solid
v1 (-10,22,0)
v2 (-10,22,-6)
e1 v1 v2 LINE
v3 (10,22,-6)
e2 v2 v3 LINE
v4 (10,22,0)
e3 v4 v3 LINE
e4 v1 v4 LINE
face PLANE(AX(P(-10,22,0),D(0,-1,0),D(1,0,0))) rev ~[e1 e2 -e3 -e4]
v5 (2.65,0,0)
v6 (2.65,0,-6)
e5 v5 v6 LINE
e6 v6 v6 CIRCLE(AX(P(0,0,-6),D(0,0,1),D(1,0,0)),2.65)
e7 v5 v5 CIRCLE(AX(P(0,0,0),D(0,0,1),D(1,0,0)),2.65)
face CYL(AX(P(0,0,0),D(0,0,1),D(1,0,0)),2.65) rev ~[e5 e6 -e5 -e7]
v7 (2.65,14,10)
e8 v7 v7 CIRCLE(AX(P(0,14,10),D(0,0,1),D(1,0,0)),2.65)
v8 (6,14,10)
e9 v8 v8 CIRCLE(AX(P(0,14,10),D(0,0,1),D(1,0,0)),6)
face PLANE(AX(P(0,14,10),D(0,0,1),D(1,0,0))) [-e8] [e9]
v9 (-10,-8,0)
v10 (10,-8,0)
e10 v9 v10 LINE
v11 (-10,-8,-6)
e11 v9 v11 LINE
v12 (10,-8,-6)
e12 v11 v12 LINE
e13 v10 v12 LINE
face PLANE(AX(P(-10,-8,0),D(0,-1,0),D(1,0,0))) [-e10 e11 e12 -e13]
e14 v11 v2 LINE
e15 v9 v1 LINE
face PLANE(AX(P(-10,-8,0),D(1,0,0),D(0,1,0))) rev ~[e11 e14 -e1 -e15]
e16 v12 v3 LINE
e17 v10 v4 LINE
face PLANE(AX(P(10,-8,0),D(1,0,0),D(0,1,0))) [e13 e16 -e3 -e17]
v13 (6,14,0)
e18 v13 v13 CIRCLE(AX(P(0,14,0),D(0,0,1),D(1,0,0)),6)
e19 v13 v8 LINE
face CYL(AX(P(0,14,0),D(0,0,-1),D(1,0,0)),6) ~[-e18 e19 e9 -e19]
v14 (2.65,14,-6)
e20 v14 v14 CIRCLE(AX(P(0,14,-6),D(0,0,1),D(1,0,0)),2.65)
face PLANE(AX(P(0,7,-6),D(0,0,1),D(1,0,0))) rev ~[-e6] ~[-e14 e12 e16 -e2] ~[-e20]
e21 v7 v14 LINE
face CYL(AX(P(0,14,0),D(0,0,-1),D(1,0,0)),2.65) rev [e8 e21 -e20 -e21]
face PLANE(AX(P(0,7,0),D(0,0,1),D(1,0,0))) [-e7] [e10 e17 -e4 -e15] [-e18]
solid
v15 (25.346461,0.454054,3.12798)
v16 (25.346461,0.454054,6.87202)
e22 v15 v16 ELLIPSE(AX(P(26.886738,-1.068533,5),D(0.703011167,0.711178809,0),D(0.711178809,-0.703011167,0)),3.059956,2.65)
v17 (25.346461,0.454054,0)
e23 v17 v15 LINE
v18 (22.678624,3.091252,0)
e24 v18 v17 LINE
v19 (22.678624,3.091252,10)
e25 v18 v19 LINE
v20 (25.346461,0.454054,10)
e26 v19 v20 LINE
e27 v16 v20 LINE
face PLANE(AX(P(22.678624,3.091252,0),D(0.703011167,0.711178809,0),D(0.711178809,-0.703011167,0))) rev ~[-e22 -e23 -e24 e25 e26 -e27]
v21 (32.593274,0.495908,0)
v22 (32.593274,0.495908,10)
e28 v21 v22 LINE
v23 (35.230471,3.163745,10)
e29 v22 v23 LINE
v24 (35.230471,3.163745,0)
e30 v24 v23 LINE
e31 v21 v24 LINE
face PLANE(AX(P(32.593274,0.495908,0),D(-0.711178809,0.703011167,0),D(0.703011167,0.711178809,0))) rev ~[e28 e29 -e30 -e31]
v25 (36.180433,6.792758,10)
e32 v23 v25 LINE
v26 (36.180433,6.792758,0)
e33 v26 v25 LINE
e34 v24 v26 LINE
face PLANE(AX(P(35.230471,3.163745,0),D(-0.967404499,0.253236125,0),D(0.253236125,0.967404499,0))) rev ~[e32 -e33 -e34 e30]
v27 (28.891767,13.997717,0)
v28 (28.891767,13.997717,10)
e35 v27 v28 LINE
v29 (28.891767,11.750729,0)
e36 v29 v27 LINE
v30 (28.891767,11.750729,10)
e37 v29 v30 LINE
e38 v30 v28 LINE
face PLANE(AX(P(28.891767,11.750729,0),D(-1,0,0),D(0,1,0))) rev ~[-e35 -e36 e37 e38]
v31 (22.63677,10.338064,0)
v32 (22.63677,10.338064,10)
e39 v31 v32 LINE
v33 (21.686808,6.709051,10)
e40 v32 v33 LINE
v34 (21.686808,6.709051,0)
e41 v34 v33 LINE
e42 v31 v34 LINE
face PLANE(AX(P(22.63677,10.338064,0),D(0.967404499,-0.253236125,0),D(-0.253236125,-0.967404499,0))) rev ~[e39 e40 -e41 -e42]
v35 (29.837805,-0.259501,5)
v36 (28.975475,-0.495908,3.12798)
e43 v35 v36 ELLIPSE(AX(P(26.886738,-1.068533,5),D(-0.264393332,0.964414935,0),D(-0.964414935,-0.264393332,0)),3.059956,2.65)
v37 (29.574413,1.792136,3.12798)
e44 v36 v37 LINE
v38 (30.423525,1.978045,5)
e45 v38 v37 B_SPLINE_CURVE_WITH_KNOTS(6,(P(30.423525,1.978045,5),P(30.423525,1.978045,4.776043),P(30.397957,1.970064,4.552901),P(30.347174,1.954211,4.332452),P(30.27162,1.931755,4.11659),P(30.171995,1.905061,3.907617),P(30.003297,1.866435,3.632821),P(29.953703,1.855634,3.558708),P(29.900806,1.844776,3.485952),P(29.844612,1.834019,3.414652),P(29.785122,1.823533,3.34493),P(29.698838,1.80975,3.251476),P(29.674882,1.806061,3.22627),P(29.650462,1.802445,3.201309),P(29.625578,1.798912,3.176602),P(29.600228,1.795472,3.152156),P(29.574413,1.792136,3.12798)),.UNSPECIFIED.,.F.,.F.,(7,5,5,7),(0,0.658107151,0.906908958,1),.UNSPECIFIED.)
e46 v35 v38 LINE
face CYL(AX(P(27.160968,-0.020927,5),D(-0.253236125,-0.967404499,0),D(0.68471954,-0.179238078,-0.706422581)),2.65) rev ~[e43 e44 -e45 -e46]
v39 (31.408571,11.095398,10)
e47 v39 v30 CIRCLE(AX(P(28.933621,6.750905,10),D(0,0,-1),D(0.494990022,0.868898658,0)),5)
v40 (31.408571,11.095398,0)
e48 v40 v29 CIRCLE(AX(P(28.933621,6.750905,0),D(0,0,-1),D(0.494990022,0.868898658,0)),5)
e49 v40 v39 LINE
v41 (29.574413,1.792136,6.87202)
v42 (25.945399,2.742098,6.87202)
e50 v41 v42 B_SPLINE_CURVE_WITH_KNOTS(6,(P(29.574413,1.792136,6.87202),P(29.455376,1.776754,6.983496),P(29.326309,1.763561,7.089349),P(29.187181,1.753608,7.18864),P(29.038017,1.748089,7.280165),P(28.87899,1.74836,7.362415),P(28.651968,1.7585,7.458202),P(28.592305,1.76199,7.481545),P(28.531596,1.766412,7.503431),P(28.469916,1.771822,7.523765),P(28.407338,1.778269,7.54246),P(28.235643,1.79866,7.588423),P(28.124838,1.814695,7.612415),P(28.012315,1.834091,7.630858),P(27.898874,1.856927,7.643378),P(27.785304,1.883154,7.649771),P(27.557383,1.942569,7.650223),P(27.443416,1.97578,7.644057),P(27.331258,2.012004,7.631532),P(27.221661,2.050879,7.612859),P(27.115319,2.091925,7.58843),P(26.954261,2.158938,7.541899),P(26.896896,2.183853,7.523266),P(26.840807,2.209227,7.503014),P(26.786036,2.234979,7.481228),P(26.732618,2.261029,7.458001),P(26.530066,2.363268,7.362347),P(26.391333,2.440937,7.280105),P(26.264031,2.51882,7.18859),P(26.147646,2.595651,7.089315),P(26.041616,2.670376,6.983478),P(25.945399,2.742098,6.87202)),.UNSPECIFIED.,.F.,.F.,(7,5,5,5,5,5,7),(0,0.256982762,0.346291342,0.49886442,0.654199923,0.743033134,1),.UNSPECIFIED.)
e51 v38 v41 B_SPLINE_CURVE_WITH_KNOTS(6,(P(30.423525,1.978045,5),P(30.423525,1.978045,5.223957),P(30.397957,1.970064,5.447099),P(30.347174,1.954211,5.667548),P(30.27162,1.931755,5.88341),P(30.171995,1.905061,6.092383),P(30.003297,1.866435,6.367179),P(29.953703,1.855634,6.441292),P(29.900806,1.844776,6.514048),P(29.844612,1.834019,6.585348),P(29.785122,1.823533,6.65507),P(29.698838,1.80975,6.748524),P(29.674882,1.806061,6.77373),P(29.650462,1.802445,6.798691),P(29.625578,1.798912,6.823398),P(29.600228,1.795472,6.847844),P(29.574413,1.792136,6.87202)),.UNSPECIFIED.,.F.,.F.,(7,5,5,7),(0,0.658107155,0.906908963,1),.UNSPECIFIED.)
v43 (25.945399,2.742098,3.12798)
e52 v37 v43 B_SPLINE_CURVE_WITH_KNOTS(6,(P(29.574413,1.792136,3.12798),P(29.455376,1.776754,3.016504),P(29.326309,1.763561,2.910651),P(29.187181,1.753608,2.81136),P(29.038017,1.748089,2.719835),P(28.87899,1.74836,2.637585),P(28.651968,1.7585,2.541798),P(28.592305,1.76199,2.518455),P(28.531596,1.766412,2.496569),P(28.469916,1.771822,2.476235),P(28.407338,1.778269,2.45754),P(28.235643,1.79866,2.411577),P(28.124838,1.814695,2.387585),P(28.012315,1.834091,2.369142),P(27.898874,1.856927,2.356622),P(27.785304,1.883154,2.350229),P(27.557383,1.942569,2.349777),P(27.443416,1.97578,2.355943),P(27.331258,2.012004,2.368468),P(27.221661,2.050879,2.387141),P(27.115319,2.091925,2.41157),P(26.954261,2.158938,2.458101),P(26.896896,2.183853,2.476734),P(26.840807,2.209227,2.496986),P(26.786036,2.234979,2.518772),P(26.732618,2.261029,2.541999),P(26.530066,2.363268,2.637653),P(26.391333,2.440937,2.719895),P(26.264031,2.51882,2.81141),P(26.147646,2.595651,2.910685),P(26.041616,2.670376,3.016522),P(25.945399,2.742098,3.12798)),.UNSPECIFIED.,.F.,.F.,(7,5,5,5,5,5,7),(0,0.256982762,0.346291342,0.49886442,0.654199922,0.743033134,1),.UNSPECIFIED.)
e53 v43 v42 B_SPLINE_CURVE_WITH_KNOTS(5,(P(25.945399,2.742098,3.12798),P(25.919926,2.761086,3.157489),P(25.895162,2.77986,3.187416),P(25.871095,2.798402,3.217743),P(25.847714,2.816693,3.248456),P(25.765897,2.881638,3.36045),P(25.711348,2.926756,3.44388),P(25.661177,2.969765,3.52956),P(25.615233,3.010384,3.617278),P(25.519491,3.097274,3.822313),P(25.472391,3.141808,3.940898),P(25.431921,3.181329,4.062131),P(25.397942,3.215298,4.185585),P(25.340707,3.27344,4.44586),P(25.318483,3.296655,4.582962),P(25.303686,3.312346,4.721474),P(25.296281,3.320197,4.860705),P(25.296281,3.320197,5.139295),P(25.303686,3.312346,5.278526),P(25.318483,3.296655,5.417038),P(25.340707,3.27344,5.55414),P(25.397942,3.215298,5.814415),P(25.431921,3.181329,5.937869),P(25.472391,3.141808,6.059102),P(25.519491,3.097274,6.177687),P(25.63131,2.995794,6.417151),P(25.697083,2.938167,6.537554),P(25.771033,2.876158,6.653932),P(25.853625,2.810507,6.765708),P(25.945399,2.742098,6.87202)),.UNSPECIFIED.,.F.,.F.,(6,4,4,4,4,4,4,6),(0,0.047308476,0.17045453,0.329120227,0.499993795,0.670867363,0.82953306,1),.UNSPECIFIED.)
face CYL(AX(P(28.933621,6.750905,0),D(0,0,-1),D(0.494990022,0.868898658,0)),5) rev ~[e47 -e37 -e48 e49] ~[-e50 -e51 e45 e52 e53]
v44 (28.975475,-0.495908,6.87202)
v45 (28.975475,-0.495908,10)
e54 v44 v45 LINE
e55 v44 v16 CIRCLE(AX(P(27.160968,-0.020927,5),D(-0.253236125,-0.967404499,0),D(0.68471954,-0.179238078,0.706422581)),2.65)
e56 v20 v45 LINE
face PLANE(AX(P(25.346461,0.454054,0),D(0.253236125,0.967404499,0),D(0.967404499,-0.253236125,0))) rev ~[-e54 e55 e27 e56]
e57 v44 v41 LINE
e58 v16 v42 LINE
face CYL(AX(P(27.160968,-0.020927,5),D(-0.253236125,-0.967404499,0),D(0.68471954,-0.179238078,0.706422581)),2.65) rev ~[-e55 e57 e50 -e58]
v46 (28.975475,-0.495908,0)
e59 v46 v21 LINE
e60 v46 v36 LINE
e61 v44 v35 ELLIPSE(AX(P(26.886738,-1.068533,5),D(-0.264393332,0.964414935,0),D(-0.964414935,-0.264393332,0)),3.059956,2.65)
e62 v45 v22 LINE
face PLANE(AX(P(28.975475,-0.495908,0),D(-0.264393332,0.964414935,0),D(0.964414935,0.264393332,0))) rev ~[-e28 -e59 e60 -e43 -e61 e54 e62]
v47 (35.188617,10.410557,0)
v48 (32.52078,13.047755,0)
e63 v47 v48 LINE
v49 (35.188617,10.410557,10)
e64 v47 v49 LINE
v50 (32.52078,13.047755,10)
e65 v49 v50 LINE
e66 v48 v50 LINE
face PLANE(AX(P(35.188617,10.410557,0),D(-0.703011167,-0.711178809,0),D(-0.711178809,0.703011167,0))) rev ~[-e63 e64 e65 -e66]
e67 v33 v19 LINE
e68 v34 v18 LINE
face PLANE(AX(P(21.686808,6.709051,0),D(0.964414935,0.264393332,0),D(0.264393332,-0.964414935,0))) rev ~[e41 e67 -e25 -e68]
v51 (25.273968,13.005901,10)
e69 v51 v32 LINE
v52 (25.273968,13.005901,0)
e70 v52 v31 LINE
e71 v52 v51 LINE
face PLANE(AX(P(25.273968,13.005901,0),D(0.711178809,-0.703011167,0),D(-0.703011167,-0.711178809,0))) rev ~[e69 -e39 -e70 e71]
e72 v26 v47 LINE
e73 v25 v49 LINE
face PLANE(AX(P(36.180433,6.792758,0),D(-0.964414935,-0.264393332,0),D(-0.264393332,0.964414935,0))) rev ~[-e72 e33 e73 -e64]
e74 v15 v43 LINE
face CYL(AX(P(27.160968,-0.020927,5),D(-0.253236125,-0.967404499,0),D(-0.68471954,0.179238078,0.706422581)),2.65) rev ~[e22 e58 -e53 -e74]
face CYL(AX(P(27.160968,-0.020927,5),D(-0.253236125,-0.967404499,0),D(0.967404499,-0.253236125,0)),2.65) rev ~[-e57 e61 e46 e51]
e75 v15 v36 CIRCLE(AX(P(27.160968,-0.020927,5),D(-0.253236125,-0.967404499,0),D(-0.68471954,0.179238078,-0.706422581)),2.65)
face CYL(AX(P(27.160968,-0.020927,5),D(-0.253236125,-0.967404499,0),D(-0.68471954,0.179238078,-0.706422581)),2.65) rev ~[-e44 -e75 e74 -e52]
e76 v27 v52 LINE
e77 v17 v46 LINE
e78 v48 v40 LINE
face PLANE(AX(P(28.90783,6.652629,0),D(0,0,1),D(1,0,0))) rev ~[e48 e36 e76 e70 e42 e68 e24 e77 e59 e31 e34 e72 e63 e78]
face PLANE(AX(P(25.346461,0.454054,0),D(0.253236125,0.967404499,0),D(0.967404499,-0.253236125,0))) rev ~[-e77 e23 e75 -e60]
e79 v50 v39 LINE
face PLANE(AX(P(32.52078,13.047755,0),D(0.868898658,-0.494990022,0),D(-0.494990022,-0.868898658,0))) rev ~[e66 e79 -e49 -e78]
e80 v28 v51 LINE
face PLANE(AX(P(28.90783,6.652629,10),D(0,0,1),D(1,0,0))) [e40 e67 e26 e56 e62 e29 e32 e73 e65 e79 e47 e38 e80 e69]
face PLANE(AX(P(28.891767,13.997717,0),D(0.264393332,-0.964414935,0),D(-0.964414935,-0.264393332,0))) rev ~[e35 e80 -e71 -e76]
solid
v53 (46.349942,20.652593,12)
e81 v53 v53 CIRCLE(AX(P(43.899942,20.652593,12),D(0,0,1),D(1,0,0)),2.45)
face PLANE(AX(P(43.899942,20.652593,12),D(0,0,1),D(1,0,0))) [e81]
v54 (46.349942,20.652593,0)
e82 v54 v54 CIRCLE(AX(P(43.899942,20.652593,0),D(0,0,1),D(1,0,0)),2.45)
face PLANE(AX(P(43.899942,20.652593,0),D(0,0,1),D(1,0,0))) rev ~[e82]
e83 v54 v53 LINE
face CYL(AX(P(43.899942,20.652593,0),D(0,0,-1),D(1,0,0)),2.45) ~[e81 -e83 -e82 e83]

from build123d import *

# Parameters (mm, degrees)
F0_W     = 20
F0_H     = 30
F0_R     = 2.65
F0_R_2   = 6
F1_DEPTH = 6
F2_DEPTH = 10
F3_DEPTH = 10
F5_DEPTH = 2.7610118925
F0_R_3   = 2.45
F6_DEPTH = 12


# Not quite as in the source:
# - a feature names something its author has since deleted; it is built from what else it names


with BuildPart() as f1:
    # F0 (on Top) → F1 (new body)
    with BuildSketch(Plane.XY):
        with Locations((0, 7)):
            Rectangle(F0_W, F0_H)
        Circle(F0_R, mode=Mode.SUBTRACT)
        with Locations((0, 14)):
            Circle(F0_R_2, mode=Mode.SUBTRACT)
        with Locations((0, 14)):
            Circle(F0_R_2)
        with Locations((0, 14)):
            Circle(F0_R, mode=Mode.SUBTRACT)
    extrude(amount=-F1_DEPTH)

    # F0 (on Top) → F2 (join)
    with BuildSketch(Plane.XY):
        with Locations((0, 14)):
            Circle(F0_R_2)
        with Locations((0, 14)):
            Circle(F0_R, mode=Mode.SUBTRACT)
    extrude(amount=F2_DEPTH)


with BuildPart() as f3:
    # F0 (on Top) → F3 (new body)
    with BuildSketch(Plane.XY):
        with BuildLine():
            ThreePointArc((31.4085708903, 11.0953978322), (27.6737183454, 1.912242965), (28.8917668759, 11.750729364))
            Line((28.8917668759, 11.750729364), (28.8917668759, 13.9977169424))
            Line((28.8917668759, 13.9977169424), (25.2739680355, 13.0059012255))
            Line((25.2739680355, 13.0059012255), (22.6367701923, 10.3380641986))
            Line((22.6367701923, 10.3380641986), (21.6868083789, 6.7090506386))
            Line((21.6868083789, 6.7090506386), (22.6786240958, 3.0912517981))
            Line((22.6786240958, 3.0912517981), (25.3464611227, 0.454053955))
            Line((25.3464611227, 0.454053955), (28.9754746827, -0.4959078585))
            Line((28.9754746827, -0.4959078585), (32.5932735232, 0.4959078585))
            Line((32.5932735232, 0.4959078585), (35.2304713663, 3.1637448854))
            Line((35.2304713663, 3.1637448854), (36.1804331798, 6.7927584454))
            Line((36.1804331798, 6.7927584454), (35.1886174628, 10.4105572858))
            Line((35.1886174628, 10.4105572858), (32.5207804359, 13.047755129))
            Line((32.5207804359, 13.047755129), (31.4085708903, 11.0953978322))
        make_face()
    extrude(amount=F3_DEPTH)

    # F4 (on face) → F5 (cut, through all)
    with BuildSketch(Plane(origin=(1.7366663624, 6.63435697, 0), x_dir=(0.9674044991, -0.2532361252, 0), z_dir=(-0.2532361252, -0.9674044991, 0))):
        with BuildLine():
            Line((28.1565863562, 6.8720198406), (28.1565863562, 3.1279801594))
            ThreePointArc((28.1565863562, 3.1279801594), (28.7297128763, 3.9870729344), (28.9309420092, 5))
            ThreePointArc((28.9309420092, 5), (28.7297128763, 6.0129270656), (28.1565863562, 6.8720198406))
        make_face()
        with BuildLine():
            Line((24.4052976622, 6.8720198406), (24.4052976622, 3.1279801594))
            ThreePointArc((24.4052976622, 3.1279801594), (26.2809420092, 2.35), (28.1565863562, 3.1279801594))
            Line((28.1565863562, 3.1279801594), (28.1565863562, 6.8720198406))
            ThreePointArc((28.1565863562, 6.8720198406), (26.2809420092, 7.65), (24.4052976622, 6.8720198406))
        make_face()
        with BuildLine():
            ThreePointArc((24.4052976622, 6.8720198406), (23.6309420092, 5), (24.4052976622, 3.1279801594))
            Line((24.4052976622, 3.1279801594), (24.4052976622, 6.8720198406))
        make_face()
    extrude(amount=-F5_DEPTH, mode=Mode.SUBTRACT)


with BuildPart() as f6:
    # F0 (on Top) → F6 (new body)
    with BuildSketch(Plane.XY):
        with Locations((43.8999424085, 20.652592666)):
            Circle(F0_R_3)
    extrude(amount=F6_DEPTH)


solid = Compound([f1.part, f3.part, f6.part])
